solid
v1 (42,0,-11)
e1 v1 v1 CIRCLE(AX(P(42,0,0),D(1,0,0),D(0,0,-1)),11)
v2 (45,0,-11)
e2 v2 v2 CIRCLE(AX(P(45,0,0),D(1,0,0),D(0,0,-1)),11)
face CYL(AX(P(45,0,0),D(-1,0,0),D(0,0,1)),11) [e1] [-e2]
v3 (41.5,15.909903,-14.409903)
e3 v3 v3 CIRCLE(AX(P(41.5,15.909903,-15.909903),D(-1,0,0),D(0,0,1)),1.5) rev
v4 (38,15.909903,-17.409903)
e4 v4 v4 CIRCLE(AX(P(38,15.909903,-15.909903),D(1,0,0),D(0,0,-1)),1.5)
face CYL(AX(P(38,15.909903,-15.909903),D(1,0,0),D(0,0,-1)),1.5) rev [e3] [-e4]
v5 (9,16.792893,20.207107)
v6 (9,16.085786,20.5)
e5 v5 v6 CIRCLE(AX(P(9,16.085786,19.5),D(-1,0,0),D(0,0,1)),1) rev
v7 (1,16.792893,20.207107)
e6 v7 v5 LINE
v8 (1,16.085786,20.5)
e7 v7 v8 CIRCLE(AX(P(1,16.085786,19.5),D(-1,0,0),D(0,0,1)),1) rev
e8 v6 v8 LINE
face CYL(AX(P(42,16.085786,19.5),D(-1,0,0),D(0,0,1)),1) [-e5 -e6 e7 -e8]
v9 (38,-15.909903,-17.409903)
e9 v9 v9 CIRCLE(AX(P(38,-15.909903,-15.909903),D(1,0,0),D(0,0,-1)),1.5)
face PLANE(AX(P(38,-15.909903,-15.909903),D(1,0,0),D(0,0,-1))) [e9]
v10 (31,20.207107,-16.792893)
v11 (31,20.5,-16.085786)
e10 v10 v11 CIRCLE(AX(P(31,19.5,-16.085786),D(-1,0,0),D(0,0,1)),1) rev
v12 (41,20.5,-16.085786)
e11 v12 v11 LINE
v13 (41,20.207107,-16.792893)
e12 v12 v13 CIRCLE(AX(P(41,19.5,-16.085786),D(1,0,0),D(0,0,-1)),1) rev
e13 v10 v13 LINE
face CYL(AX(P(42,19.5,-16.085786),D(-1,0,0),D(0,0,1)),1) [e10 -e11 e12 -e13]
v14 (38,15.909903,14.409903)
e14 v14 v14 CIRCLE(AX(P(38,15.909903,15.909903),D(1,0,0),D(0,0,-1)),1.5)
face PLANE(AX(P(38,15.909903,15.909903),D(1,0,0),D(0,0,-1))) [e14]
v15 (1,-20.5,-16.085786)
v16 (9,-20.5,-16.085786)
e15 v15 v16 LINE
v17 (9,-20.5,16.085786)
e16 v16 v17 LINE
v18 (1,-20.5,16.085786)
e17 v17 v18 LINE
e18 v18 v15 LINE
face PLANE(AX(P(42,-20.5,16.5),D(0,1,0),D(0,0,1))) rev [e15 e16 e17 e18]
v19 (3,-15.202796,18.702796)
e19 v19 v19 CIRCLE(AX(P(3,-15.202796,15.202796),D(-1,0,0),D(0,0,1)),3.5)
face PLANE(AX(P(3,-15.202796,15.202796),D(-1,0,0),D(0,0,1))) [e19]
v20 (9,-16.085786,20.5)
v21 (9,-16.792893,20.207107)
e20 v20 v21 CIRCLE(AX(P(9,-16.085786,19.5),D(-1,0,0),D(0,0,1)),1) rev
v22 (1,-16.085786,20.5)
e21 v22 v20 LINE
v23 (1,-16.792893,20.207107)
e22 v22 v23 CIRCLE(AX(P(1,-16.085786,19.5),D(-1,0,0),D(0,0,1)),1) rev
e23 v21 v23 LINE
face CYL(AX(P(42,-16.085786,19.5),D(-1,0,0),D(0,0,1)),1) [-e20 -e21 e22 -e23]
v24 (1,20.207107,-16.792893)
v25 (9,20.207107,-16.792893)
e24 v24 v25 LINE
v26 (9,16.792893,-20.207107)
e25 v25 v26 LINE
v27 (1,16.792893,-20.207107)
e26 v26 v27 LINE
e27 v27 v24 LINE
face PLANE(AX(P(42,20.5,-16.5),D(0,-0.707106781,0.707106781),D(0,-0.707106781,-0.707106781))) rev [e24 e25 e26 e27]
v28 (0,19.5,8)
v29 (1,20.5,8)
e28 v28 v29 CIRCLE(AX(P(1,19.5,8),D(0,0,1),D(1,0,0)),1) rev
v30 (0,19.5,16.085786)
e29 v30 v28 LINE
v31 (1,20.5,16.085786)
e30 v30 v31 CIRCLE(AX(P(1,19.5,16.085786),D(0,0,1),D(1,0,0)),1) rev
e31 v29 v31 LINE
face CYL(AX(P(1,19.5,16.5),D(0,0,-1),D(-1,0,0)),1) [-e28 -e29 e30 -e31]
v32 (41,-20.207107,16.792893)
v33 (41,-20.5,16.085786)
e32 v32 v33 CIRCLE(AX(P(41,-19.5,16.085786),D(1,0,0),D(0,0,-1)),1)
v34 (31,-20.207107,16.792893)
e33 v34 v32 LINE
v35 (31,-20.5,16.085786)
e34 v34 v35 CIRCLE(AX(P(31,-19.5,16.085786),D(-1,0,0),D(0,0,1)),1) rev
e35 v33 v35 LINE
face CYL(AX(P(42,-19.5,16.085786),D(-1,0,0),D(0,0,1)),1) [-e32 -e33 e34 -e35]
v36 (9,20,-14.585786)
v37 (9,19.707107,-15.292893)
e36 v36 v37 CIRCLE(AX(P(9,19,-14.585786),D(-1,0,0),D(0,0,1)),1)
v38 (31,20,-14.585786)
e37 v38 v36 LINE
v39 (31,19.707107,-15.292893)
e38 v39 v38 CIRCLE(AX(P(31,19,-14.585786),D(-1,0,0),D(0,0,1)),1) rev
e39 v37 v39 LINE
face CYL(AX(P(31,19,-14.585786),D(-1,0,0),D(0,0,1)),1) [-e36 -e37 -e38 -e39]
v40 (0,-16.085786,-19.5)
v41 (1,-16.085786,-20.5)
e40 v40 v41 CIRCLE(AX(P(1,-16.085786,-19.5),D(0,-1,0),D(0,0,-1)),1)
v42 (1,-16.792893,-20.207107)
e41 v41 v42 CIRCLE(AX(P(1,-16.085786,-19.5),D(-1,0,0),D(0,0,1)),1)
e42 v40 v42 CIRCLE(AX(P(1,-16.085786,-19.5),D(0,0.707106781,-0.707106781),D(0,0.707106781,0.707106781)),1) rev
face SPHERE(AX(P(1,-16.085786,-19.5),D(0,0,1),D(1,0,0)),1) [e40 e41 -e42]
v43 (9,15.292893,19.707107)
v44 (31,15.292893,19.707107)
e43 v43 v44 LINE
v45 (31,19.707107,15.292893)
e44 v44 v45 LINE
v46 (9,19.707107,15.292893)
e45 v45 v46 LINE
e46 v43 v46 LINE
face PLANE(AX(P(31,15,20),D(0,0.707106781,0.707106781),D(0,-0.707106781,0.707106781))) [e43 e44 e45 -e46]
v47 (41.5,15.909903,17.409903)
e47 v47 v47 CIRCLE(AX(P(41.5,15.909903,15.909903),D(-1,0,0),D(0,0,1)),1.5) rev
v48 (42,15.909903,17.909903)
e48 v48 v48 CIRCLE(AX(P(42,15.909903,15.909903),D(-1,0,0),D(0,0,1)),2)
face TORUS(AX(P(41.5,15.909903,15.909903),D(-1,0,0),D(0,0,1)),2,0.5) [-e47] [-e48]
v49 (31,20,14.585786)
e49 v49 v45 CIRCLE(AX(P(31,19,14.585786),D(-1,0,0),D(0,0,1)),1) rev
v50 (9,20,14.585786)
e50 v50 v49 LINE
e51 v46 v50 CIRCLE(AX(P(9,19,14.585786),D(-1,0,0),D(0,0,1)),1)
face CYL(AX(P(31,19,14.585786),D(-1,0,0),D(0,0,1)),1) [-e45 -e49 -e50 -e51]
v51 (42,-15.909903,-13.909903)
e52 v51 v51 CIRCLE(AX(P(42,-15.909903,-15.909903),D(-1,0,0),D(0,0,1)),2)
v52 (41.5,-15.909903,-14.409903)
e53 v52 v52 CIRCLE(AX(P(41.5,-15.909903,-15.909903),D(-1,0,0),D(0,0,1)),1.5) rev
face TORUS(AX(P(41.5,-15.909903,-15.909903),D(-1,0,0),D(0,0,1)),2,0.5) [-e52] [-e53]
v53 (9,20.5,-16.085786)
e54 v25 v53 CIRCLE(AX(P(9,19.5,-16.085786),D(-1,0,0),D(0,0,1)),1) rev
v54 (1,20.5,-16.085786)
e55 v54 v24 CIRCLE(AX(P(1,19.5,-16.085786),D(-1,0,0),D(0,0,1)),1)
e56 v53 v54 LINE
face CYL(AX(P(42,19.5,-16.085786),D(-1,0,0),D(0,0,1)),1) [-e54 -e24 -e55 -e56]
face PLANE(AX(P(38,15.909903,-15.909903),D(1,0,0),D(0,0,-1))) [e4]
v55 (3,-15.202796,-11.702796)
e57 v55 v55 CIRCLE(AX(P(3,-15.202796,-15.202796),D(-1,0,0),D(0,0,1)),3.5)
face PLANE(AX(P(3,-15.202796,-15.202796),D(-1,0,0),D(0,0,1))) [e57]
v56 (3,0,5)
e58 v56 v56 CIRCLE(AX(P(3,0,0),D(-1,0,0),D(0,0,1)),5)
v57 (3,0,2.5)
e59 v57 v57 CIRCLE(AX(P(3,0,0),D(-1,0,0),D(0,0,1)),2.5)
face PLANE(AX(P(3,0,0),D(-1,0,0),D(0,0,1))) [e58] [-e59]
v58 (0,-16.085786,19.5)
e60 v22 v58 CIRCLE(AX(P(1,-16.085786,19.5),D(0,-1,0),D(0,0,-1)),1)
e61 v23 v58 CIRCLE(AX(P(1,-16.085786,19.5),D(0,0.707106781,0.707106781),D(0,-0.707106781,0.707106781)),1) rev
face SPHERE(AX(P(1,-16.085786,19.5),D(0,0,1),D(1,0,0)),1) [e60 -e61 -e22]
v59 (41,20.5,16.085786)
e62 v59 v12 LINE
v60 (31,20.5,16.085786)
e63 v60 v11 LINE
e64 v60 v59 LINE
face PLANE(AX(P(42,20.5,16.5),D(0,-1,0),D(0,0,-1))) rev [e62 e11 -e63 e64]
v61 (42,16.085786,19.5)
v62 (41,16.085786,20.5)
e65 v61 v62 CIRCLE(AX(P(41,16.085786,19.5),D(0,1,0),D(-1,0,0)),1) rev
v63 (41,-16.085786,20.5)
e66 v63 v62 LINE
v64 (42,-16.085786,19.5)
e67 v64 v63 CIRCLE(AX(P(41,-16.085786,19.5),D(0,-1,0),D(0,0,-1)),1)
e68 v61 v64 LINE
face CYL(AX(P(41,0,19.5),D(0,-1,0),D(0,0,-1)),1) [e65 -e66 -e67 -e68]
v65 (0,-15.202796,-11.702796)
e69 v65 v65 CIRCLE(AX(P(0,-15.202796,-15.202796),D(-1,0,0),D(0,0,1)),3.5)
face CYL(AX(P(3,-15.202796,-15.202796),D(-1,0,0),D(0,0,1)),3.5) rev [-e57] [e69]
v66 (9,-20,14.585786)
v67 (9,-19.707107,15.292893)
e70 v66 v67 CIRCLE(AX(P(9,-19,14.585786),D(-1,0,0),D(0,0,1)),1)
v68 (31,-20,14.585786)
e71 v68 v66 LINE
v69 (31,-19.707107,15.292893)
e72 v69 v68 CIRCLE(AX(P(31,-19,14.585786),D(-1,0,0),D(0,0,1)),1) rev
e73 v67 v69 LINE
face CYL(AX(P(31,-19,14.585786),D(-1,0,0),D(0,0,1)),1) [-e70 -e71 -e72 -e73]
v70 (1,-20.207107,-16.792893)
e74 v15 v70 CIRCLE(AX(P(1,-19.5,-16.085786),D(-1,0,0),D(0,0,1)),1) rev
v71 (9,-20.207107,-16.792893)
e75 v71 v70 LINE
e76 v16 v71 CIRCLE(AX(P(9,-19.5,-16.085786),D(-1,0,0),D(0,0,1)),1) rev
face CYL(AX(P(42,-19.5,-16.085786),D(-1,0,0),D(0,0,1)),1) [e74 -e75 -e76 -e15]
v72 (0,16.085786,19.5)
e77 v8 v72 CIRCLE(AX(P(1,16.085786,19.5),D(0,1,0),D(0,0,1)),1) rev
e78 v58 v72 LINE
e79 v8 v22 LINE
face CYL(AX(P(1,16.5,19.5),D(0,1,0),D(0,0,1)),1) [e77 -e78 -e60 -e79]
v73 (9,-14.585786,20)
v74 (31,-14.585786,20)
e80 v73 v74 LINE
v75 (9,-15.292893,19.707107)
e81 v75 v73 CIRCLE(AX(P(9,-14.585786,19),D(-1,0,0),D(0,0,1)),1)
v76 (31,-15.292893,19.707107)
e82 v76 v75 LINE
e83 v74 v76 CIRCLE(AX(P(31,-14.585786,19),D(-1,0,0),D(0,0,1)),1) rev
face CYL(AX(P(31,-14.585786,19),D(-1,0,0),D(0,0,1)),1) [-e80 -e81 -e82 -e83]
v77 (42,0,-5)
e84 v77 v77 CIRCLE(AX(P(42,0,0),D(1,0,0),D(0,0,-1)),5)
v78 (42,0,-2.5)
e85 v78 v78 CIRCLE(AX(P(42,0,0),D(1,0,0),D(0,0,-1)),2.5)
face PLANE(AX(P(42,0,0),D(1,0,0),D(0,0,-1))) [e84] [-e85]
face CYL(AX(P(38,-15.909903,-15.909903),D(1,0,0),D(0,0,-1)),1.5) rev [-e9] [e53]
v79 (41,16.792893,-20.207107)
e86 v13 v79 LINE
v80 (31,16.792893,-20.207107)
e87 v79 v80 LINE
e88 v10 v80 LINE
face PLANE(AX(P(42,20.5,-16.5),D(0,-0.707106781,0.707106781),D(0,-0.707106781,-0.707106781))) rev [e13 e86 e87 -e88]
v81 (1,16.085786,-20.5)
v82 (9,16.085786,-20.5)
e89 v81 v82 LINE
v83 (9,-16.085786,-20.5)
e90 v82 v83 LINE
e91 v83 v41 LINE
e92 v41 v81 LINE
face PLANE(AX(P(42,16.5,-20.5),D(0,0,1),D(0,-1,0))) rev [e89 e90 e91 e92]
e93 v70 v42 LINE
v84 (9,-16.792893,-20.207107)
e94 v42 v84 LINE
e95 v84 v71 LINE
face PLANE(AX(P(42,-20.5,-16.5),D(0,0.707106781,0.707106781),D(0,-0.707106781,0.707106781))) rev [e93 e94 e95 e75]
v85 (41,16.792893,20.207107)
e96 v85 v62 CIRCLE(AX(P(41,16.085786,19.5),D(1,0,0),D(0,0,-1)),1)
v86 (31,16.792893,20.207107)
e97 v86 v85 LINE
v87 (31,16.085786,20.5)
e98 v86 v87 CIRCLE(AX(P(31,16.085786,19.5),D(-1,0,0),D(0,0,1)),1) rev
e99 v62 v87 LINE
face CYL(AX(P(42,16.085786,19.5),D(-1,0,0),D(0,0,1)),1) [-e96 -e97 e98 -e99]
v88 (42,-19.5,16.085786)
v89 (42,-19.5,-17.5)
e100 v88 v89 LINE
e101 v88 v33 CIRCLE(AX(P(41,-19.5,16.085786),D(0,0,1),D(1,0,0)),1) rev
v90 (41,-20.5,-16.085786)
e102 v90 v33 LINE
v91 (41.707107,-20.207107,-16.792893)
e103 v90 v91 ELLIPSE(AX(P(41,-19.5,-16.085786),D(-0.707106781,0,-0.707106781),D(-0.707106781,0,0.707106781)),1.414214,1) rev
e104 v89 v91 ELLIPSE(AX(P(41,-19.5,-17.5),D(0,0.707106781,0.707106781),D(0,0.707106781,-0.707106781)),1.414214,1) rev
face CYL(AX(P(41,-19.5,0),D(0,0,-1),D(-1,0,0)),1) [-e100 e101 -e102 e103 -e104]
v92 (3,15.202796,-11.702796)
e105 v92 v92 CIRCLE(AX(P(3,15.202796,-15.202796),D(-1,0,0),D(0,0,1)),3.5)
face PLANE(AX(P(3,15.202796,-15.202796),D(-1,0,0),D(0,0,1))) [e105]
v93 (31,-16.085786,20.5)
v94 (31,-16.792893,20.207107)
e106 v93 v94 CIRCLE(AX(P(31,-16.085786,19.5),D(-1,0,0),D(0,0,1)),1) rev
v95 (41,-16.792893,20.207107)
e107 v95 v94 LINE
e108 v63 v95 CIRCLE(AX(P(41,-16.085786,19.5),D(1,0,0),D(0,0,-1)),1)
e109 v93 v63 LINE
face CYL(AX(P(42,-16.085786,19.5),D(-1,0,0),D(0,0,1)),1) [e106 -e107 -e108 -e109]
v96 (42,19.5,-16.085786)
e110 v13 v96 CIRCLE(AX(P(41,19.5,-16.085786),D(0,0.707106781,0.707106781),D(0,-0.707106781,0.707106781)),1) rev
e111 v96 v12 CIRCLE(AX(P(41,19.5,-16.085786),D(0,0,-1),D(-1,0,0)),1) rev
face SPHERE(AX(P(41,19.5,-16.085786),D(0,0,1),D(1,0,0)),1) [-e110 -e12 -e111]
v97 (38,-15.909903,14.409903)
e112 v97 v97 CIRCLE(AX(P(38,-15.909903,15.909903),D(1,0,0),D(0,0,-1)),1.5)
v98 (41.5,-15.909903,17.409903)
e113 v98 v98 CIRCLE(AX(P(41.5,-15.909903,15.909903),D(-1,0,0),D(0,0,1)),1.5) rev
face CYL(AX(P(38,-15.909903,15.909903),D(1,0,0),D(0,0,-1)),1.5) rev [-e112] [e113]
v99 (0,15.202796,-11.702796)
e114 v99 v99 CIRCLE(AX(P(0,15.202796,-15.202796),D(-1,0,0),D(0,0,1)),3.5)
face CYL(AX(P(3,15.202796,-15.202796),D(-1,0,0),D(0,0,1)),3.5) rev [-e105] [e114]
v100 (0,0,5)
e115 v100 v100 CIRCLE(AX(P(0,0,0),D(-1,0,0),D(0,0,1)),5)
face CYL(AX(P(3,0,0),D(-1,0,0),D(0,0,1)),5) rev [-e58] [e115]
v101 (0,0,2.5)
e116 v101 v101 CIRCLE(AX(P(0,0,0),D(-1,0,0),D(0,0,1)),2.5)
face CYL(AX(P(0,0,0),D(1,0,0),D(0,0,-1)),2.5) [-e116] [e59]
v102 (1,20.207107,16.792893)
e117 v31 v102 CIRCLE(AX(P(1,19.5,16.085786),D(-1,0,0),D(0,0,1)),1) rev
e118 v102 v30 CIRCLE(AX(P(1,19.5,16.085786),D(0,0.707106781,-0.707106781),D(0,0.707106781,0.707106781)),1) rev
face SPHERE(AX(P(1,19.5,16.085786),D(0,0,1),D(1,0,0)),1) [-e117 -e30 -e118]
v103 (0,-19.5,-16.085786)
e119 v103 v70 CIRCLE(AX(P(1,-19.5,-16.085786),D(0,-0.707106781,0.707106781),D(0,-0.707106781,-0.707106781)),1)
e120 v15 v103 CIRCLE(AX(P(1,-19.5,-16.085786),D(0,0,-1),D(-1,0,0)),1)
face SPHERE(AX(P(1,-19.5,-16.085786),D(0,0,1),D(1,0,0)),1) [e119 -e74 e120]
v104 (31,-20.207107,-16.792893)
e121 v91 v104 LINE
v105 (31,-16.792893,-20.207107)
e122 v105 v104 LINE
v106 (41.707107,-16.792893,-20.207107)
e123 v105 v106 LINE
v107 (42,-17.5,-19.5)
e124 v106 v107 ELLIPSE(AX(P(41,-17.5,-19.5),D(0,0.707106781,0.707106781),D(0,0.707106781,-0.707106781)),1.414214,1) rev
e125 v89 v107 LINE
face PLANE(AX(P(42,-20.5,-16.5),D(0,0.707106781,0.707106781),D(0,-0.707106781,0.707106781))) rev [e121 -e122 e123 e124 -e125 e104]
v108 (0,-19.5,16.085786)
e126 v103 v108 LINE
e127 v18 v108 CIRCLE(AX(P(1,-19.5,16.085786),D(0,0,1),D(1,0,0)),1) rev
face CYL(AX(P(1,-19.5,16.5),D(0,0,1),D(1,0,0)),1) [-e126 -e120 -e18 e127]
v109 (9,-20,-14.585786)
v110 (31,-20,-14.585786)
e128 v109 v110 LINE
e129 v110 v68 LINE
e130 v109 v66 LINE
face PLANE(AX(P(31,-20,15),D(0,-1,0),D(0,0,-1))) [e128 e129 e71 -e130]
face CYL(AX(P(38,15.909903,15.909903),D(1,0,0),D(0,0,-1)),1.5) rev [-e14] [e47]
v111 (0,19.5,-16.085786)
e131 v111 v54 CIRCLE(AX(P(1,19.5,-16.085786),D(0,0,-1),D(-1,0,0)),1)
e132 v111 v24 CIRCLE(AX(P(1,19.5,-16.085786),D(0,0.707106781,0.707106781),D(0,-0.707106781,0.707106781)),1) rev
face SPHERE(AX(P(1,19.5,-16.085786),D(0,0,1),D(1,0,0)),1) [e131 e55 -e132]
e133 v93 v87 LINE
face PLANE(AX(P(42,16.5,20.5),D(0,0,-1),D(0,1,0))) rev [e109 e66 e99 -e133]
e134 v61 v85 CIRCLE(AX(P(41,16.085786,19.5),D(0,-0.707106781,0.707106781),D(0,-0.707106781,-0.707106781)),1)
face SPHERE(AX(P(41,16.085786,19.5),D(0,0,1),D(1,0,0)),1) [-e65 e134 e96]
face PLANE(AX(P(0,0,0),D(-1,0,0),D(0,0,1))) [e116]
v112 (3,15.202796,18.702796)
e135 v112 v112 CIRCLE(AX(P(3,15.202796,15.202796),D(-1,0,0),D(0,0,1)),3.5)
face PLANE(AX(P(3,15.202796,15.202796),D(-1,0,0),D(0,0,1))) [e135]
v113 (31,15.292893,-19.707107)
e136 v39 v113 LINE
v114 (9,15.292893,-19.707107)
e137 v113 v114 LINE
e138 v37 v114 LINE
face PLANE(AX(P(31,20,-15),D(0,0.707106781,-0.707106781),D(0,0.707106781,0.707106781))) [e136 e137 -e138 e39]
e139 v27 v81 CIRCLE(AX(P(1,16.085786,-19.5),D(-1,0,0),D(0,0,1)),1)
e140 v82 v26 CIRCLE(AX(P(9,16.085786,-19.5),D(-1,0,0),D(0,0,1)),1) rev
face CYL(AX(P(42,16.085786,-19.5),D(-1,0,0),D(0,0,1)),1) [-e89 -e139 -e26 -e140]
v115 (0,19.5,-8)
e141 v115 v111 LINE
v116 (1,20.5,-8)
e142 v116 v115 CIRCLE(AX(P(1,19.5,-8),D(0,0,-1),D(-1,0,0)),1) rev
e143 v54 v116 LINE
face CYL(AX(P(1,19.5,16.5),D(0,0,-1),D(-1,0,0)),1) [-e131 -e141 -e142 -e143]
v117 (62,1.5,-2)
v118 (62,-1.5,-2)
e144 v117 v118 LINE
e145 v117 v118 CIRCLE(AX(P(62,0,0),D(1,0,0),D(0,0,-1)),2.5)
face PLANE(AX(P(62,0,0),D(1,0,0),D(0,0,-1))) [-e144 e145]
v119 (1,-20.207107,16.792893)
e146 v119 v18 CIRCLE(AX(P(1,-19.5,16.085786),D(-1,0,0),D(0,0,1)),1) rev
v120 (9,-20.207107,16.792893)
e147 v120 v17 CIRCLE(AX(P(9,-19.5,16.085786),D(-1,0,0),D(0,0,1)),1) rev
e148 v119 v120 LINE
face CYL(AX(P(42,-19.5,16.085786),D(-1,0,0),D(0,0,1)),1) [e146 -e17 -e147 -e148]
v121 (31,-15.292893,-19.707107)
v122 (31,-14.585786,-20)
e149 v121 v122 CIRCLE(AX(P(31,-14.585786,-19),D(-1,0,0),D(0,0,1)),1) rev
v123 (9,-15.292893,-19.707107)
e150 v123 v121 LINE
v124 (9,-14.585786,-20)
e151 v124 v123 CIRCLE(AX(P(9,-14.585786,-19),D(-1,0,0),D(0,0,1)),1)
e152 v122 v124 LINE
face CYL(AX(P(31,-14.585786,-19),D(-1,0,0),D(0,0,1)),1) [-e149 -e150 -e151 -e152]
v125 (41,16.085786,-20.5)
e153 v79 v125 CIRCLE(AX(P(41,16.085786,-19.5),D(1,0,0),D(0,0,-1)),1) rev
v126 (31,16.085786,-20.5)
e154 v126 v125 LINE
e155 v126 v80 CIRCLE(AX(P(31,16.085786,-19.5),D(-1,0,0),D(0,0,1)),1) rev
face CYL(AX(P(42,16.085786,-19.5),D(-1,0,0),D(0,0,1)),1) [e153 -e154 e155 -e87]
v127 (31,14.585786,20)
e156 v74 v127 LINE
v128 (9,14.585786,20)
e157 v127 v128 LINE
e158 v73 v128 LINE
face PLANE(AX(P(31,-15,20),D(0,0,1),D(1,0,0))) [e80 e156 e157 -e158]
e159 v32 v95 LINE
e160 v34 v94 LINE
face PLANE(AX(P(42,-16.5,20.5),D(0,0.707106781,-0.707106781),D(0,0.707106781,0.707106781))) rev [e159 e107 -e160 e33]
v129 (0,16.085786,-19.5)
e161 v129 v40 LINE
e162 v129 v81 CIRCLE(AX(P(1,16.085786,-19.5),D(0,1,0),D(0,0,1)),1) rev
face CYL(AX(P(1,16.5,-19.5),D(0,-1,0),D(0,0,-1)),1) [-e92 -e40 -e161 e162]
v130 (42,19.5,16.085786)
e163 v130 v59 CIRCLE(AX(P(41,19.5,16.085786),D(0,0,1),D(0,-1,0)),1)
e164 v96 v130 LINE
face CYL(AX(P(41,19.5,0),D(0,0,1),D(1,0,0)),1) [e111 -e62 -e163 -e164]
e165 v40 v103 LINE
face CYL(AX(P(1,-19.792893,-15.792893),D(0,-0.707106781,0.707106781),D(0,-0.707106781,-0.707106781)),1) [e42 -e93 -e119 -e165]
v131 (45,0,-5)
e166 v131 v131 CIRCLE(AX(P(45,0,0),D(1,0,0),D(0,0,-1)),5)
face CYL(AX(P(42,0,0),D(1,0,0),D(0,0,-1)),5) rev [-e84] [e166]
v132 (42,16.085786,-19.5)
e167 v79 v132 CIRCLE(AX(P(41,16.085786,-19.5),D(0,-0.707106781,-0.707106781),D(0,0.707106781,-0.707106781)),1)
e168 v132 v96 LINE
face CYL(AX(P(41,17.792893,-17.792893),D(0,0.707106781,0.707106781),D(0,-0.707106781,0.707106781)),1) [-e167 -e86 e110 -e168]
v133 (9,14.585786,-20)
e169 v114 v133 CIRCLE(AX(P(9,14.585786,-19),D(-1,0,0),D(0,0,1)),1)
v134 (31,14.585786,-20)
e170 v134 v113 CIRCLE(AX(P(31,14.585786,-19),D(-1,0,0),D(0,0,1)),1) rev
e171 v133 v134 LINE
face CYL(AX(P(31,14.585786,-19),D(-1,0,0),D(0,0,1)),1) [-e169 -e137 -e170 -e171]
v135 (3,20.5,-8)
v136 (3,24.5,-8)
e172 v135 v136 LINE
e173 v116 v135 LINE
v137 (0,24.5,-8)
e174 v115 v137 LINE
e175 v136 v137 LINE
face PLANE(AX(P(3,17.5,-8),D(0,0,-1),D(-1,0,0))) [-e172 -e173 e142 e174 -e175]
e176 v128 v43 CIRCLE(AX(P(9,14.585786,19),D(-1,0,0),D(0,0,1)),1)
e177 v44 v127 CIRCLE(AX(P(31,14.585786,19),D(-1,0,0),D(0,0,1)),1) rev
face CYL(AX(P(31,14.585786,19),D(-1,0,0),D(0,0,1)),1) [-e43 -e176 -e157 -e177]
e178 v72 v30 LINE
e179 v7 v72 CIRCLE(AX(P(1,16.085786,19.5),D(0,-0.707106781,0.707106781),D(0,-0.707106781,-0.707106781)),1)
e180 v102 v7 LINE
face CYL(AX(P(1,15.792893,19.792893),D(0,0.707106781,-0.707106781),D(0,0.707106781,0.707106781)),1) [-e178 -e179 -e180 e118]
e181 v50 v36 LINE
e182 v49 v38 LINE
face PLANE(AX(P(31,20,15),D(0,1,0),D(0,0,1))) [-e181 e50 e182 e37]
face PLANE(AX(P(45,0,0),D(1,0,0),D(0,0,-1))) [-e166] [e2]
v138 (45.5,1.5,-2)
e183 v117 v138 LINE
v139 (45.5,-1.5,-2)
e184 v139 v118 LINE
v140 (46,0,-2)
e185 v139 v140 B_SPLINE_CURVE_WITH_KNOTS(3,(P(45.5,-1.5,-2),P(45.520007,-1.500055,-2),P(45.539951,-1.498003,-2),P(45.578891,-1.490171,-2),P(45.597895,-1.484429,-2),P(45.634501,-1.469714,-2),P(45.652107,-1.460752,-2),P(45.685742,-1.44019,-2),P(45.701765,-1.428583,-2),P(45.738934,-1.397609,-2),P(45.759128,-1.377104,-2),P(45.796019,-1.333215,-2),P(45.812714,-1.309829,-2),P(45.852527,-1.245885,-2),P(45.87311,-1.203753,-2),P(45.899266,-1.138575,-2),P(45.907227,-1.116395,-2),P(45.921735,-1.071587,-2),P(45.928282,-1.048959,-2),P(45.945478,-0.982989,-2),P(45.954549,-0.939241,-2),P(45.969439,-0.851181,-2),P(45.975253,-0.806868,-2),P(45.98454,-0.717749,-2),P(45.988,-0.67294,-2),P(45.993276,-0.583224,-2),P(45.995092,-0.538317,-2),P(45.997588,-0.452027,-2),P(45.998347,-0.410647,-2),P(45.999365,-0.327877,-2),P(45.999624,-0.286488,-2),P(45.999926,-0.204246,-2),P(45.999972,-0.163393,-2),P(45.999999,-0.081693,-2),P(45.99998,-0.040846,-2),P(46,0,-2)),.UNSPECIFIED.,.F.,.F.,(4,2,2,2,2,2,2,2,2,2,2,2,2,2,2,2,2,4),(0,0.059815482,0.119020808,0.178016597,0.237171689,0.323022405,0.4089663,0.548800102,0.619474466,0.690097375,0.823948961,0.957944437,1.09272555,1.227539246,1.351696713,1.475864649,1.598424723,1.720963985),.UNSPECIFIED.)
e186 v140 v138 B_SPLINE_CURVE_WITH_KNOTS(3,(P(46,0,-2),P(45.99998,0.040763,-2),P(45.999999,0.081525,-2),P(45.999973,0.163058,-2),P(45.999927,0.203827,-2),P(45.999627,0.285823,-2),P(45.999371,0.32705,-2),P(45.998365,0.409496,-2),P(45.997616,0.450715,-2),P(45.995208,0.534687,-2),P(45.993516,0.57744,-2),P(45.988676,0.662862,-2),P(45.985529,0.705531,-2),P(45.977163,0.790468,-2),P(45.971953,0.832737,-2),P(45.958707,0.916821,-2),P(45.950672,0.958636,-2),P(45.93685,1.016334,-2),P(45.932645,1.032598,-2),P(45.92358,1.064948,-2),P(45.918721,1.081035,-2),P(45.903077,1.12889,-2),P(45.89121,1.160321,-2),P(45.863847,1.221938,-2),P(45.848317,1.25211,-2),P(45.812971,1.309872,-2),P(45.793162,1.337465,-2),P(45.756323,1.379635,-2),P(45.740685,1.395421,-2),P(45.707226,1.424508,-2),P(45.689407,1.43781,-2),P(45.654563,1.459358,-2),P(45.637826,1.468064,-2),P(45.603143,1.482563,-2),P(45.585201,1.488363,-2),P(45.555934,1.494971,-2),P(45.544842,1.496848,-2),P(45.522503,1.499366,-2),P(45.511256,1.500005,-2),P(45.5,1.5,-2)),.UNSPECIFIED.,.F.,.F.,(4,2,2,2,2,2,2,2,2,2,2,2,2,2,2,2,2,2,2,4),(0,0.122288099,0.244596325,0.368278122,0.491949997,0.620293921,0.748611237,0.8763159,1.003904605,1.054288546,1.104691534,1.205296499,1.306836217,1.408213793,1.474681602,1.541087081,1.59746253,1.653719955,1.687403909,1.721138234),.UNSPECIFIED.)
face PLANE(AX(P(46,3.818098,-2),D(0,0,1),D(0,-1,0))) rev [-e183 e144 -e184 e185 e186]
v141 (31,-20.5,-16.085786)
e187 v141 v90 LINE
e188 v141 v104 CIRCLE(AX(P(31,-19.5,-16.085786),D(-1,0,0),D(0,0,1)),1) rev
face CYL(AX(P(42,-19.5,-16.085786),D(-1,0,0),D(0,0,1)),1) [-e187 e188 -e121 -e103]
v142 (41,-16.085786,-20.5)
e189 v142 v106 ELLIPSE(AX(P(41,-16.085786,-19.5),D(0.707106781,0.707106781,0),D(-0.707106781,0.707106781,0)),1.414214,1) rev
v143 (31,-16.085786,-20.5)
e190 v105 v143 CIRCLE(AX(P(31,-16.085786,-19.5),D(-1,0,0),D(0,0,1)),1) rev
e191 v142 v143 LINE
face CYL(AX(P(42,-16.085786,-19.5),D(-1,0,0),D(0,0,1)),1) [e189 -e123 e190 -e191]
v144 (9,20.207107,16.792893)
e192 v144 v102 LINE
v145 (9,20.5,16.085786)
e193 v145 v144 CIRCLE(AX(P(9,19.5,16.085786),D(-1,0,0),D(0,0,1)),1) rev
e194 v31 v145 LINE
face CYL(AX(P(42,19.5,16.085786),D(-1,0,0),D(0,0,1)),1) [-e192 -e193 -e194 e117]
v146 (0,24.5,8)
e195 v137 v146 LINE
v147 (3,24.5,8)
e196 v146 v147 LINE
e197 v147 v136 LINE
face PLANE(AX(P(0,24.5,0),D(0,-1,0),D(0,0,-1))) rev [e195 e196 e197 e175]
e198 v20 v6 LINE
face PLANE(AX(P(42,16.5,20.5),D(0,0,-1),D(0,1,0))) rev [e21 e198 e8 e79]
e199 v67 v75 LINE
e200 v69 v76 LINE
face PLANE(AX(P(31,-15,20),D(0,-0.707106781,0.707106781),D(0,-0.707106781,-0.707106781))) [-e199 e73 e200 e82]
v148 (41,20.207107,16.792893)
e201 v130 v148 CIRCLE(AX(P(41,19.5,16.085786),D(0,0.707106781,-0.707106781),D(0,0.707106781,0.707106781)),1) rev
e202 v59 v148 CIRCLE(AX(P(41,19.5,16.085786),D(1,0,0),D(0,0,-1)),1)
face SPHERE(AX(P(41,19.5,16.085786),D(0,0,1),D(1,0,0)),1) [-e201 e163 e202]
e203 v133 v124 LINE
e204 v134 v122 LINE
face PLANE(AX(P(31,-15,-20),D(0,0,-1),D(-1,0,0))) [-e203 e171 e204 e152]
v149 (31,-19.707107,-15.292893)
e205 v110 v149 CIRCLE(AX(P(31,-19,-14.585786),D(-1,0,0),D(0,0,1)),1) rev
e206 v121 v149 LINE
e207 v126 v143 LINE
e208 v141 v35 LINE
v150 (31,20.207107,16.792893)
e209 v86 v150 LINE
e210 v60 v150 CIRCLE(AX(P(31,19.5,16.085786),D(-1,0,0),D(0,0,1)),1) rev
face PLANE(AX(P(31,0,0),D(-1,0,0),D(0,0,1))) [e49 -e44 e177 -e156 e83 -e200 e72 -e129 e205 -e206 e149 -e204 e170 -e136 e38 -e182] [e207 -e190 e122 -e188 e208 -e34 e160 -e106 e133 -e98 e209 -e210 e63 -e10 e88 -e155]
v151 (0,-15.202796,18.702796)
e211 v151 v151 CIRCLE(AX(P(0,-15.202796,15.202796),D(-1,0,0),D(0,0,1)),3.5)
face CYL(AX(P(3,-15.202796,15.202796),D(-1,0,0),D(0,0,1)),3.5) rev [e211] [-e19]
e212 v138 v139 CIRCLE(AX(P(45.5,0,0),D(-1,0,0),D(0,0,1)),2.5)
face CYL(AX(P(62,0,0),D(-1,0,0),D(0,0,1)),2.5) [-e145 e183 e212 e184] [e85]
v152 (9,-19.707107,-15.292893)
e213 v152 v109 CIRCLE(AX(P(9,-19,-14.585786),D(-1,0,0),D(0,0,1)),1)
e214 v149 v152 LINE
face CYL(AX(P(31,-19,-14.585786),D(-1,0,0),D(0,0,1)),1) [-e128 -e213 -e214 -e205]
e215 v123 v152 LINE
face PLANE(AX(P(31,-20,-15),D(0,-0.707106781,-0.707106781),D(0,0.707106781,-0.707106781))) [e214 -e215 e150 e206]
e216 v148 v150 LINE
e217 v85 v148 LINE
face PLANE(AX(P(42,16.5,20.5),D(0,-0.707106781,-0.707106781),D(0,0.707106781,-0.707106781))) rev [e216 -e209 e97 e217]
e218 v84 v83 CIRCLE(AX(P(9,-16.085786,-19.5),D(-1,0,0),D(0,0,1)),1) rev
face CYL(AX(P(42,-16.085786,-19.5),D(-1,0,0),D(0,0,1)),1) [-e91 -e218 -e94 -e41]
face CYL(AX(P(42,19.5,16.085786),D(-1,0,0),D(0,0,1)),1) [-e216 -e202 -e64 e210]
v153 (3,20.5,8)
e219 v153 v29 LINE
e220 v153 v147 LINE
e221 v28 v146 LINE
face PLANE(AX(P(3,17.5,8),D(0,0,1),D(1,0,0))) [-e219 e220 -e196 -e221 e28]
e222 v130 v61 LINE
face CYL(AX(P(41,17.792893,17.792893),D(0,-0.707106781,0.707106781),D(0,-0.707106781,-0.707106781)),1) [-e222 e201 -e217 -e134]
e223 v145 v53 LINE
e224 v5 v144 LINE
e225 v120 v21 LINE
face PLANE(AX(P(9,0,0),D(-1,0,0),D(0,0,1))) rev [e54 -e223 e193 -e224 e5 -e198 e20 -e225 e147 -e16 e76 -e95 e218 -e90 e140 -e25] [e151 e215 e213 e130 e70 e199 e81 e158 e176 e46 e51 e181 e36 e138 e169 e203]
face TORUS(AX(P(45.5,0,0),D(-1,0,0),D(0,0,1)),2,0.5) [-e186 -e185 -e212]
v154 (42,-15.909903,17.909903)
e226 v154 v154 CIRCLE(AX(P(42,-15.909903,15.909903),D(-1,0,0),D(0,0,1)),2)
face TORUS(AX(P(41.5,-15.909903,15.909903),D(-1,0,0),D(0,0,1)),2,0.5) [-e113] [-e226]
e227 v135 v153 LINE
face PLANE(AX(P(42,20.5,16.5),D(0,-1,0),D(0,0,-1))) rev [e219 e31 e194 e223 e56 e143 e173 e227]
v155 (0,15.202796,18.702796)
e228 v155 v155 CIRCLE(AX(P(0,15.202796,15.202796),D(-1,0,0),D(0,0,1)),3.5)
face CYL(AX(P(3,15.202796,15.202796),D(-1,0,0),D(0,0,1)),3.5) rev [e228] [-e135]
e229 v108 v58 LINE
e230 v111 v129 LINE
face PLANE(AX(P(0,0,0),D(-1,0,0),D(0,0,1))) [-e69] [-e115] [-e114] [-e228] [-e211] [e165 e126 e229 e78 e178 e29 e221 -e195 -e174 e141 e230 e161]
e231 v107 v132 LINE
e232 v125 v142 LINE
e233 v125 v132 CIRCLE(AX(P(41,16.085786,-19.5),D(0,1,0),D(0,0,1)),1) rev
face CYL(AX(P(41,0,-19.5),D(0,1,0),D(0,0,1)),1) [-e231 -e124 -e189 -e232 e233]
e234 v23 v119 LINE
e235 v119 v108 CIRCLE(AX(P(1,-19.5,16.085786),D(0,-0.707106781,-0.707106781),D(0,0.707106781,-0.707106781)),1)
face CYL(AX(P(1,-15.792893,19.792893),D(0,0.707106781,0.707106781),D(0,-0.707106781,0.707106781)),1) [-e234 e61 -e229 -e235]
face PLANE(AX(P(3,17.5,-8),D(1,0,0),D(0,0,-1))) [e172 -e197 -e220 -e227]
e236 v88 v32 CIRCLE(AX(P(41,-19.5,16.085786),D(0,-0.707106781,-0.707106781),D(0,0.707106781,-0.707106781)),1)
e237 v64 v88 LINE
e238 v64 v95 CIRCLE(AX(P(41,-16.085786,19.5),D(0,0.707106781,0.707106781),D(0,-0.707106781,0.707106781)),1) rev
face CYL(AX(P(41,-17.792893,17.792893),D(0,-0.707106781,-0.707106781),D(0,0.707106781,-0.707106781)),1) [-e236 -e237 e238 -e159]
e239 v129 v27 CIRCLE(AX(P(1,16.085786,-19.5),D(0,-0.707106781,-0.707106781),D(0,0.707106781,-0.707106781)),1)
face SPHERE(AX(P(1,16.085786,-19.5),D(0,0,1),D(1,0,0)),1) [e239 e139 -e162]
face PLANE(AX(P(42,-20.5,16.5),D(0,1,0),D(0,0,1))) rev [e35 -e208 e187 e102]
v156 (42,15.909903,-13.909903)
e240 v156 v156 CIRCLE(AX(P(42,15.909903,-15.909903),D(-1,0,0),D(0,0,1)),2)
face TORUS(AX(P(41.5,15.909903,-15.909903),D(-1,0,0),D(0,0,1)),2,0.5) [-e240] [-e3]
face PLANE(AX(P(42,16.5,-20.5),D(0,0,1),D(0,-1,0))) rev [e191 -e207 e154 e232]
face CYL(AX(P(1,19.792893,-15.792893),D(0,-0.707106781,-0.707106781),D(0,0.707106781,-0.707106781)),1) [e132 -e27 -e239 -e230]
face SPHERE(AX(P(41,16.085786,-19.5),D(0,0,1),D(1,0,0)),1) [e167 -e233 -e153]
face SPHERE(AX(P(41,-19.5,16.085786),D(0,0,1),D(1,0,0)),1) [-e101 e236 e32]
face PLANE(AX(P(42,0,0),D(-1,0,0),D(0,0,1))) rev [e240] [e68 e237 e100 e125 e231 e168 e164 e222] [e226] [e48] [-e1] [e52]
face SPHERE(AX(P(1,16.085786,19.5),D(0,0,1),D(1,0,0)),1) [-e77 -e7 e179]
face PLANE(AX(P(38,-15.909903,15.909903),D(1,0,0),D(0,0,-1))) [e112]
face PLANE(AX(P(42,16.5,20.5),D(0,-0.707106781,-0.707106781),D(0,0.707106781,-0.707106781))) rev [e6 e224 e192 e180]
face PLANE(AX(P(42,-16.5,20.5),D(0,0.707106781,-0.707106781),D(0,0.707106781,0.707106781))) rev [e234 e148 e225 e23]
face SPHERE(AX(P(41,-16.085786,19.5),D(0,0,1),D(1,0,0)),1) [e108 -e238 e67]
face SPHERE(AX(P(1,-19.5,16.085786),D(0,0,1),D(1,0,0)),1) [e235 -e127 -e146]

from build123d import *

# Parameters (mm, degrees)
BOSS_EXTRUDE1_DEPTH      = 42
SKETCH2_R                = 11
BOSS_EXTRUDE2_DEPTH      = 3
SKETCH3_R                = 5
CUT_EXTRUDE1_DEPTH       = 3
CUT_EXTRUDE2_START       = -3
SKETCH4_R                = 5
SKETCH4_R_2              = 3.5
CUT_EXTRUDE2_DEPTH       = 3
FILLET1_R                = 1
SKETCH6_OUTSIDE_W        = 57.68
SKETCH6_OUTSIDE_H        = 57.68
CUT_EXTRUDE3_DEPTH       = 22
FILLET2_R                = 1
SKETCH7_R                = 2.5
BOSS_EXTRUDE3_DEPTH      = 20
BOSS_EXTRUDE4_START      = 3
SKETCH8_R                = 2.5
BOSS_EXTRUDE4_DEPTH      = 3
BOSS_EXTRUDE5_DEPTH      = 4
BOSS_EXTRUDE5_DEPTH_BACK = 3
SKETCH9_W                = 3
SKETCH9_H                = 16
SKETCH10_R               = 1.5
CUT_EXTRUDE4_DEPTH       = 4
FILLET3_R                = 0.5
SKETCH11_W               = 4.617268101
SKETCH11_H               = 7.165509353
CUT_EXTRUDE5_DEPTH       = 16
FILLET4_R                = 0.5


with BuildPart() as part:
    # Sketch1 → Boss-Extrude1 (new body)
    with BuildSketch(Plane(origin=(0, 0, 0), x_dir=(0, 0, -1), z_dir=(1, 0, 0))):
        Polygon((16.5, 20.5), (20.5, 16.5), (20.5, -16.5), (16.5, -20.5), (-16.5, -20.5), (-20.5, -16.5), (-20.5, 16.5), (-16.5, 20.5), align=None)
    extrude(amount=BOSS_EXTRUDE1_DEPTH)

    # Sketch2 → Boss-Extrude2 (add)
    with BuildSketch(Plane(origin=(42, 0, 0), x_dir=(0, 0, -1), z_dir=(1, 0, 0))):
        Circle(SKETCH2_R)
    extrude(amount=BOSS_EXTRUDE2_DEPTH)

    # Sketch3 → Cut-Extrude1 (cut)
    with BuildSketch(Plane(origin=(45, 0, 0), x_dir=(0, 0, -1), z_dir=(1, 0, 0))):
        Circle(SKETCH3_R)
    extrude(amount=-CUT_EXTRUDE1_DEPTH, mode=Mode.SUBTRACT)

    # Sketch4 → Cut-Extrude2 (cut)
    with BuildSketch(Plane.ZY.offset(CUT_EXTRUDE2_START)):
        with Locations(Location((0, 0, 0), (0, 0, 180))):
            Circle(SKETCH4_R)
        with Locations((-15.202795796, 15.202795796)):
            Circle(SKETCH4_R_2)
        with Locations((15.202795796, 15.202795796)):
            Circle(SKETCH4_R_2)
        with Locations((15.202795796, -15.202795796)):
            Circle(SKETCH4_R_2)
        with Locations((-15.202795796, -15.202795796)):
            Circle(SKETCH4_R_2)
    extrude(amount=CUT_EXTRUDE2_DEPTH, mode=Mode.SUBTRACT)

    # Fillet1
    fillet1_edges = [part.edges().sort_by_distance(p)[0] for p in [
        (42, 0, 20.5),
        (0, 18.5, 18.5),
        (0, 20.5, 0),
        (42, -18.5, 18.5),
        (21, 20.5, -16.5),
        (21, 16.5, -20.5),
        (21, -16.5, -20.5),
        (21, -20.5, -16.5),
        (21, -20.5, 16.5),
        (21, -16.5, 20.5),
        (21, 16.5, 20.5),
        (21, 20.5, 16.5),
        (42, -20.5, 0),
        (42, 0, -20.5),
        (42, 18.5, -18.5),
        (42, 20.5, 0),
        (42, 18.5, 18.5),
        (0, 18.5, -18.5),
        (0, 0, -20.5),
        (0, -18.5, -18.5),
        (0, -20.5, 0),
        (0, -18.5, 18.5),
        (0, 0, 20.5),
    ]]
    fillet(fillet1_edges, radius=FILLET1_R)

    # Sketch6 outside → Cut-Extrude3 (cut)
    with BuildSketch(Plane.ZY.offset(-9)):
        Rectangle(SKETCH6_OUTSIDE_W, SKETCH6_OUTSIDE_H)
        Polygon((20, 15), (15, 20), (-15, 20), (-20, 15), (-20, -15), (-15, -20), (15, -20), (20, -15), align=None, mode=Mode.SUBTRACT)
    extrude(amount=-CUT_EXTRUDE3_DEPTH, mode=Mode.SUBTRACT)

    # Fillet2
    fillet2_edges = [part.edges().sort_by_distance(p)[0] for p in [
        (20, -15, 20),
        (20, -20, 15),
        (20, -20, -15),
        (20, -15, -20),
        (20, 15, -20),
        (20, 20, -15),
        (20, 20, 15),
        (20, 15, 20),
    ]]
    fillet(fillet2_edges, radius=FILLET2_R)

    # Sketch7 → Boss-Extrude3 (add)
    with BuildSketch(Plane(origin=(42, 0, 0), x_dir=(0, 0, -1), z_dir=(1, 0, 0))):
        Circle(SKETCH7_R)
    extrude(amount=BOSS_EXTRUDE3_DEPTH)

    # Sketch8 → Boss-Extrude4 (add)
    with BuildSketch(Plane.ZY.offset(-3).offset(BOSS_EXTRUDE4_START)):
        with Locations(Location((0, 0, 0), (0, 0, 180))):
            Circle(SKETCH8_R)
    extrude(amount=-BOSS_EXTRUDE4_DEPTH)

    # Sketch9 → Boss-Extrude5 (add, two sides: drawn at the far end of the back side and taken through both)
    with BuildSketch(Plane(origin=(0, 20.5, 0), x_dir=(1, 0, 0), z_dir=(0, 1, 0)).offset(-BOSS_EXTRUDE5_DEPTH_BACK)):
        with Locations((1.5, 0)):
            Rectangle(SKETCH9_W, SKETCH9_H)
    extrude(amount=BOSS_EXTRUDE5_DEPTH + BOSS_EXTRUDE5_DEPTH_BACK)

    # Sketch10 → Cut-Extrude4 (cut)
    with BuildSketch(Plane(origin=(42, 0, 0), x_dir=(0, 0, -1), z_dir=(1, 0, 0))):
        with Locations((-15.909902577, 15.909902577)):
            Circle(SKETCH10_R)
        with Locations((15.909902577, 15.909902577)):
            Circle(SKETCH10_R)
        with Locations((15.909902577, -15.909902577)):
            Circle(SKETCH10_R)
        with Locations((-15.909902577, -15.909902577)):
            Circle(SKETCH10_R)
    extrude(amount=-CUT_EXTRUDE4_DEPTH, mode=Mode.SUBTRACT)

    # Fillet3
    fillet3_edges = [part.edges().sort_by_distance(p)[0] for p in [
        (42, -15.909902577, 17.409902577),
        (42, -15.909902577, -14.409902577),
        (42, 15.909902577, -14.409902577),
        (42, 15.909902577, 17.409902577),
    ]]
    fillet(fillet3_edges, radius=FILLET3_R)

    # Sketch11 → Cut-Extrude5 (cut)
    with BuildSketch(Plane(origin=(62, 0, 0), x_dir=(0, 0, -1), z_dir=(1, 0, 0))):
        with Locations((4.308634051, 0.235343147)):
            Rectangle(SKETCH11_W, SKETCH11_H)
    extrude(amount=-CUT_EXTRUDE5_DEPTH, mode=Mode.SUBTRACT)

    # Fillet4
    fillet4_edges = [part.edges().sort_by_distance(p)[0] for p in [
        (46, 0.790569415, -2.371708245),
    ]]
    fillet(fillet4_edges, radius=FILLET4_R - 0.0001)  # a hair under: the kernel refuses the full size


solid = part.part
